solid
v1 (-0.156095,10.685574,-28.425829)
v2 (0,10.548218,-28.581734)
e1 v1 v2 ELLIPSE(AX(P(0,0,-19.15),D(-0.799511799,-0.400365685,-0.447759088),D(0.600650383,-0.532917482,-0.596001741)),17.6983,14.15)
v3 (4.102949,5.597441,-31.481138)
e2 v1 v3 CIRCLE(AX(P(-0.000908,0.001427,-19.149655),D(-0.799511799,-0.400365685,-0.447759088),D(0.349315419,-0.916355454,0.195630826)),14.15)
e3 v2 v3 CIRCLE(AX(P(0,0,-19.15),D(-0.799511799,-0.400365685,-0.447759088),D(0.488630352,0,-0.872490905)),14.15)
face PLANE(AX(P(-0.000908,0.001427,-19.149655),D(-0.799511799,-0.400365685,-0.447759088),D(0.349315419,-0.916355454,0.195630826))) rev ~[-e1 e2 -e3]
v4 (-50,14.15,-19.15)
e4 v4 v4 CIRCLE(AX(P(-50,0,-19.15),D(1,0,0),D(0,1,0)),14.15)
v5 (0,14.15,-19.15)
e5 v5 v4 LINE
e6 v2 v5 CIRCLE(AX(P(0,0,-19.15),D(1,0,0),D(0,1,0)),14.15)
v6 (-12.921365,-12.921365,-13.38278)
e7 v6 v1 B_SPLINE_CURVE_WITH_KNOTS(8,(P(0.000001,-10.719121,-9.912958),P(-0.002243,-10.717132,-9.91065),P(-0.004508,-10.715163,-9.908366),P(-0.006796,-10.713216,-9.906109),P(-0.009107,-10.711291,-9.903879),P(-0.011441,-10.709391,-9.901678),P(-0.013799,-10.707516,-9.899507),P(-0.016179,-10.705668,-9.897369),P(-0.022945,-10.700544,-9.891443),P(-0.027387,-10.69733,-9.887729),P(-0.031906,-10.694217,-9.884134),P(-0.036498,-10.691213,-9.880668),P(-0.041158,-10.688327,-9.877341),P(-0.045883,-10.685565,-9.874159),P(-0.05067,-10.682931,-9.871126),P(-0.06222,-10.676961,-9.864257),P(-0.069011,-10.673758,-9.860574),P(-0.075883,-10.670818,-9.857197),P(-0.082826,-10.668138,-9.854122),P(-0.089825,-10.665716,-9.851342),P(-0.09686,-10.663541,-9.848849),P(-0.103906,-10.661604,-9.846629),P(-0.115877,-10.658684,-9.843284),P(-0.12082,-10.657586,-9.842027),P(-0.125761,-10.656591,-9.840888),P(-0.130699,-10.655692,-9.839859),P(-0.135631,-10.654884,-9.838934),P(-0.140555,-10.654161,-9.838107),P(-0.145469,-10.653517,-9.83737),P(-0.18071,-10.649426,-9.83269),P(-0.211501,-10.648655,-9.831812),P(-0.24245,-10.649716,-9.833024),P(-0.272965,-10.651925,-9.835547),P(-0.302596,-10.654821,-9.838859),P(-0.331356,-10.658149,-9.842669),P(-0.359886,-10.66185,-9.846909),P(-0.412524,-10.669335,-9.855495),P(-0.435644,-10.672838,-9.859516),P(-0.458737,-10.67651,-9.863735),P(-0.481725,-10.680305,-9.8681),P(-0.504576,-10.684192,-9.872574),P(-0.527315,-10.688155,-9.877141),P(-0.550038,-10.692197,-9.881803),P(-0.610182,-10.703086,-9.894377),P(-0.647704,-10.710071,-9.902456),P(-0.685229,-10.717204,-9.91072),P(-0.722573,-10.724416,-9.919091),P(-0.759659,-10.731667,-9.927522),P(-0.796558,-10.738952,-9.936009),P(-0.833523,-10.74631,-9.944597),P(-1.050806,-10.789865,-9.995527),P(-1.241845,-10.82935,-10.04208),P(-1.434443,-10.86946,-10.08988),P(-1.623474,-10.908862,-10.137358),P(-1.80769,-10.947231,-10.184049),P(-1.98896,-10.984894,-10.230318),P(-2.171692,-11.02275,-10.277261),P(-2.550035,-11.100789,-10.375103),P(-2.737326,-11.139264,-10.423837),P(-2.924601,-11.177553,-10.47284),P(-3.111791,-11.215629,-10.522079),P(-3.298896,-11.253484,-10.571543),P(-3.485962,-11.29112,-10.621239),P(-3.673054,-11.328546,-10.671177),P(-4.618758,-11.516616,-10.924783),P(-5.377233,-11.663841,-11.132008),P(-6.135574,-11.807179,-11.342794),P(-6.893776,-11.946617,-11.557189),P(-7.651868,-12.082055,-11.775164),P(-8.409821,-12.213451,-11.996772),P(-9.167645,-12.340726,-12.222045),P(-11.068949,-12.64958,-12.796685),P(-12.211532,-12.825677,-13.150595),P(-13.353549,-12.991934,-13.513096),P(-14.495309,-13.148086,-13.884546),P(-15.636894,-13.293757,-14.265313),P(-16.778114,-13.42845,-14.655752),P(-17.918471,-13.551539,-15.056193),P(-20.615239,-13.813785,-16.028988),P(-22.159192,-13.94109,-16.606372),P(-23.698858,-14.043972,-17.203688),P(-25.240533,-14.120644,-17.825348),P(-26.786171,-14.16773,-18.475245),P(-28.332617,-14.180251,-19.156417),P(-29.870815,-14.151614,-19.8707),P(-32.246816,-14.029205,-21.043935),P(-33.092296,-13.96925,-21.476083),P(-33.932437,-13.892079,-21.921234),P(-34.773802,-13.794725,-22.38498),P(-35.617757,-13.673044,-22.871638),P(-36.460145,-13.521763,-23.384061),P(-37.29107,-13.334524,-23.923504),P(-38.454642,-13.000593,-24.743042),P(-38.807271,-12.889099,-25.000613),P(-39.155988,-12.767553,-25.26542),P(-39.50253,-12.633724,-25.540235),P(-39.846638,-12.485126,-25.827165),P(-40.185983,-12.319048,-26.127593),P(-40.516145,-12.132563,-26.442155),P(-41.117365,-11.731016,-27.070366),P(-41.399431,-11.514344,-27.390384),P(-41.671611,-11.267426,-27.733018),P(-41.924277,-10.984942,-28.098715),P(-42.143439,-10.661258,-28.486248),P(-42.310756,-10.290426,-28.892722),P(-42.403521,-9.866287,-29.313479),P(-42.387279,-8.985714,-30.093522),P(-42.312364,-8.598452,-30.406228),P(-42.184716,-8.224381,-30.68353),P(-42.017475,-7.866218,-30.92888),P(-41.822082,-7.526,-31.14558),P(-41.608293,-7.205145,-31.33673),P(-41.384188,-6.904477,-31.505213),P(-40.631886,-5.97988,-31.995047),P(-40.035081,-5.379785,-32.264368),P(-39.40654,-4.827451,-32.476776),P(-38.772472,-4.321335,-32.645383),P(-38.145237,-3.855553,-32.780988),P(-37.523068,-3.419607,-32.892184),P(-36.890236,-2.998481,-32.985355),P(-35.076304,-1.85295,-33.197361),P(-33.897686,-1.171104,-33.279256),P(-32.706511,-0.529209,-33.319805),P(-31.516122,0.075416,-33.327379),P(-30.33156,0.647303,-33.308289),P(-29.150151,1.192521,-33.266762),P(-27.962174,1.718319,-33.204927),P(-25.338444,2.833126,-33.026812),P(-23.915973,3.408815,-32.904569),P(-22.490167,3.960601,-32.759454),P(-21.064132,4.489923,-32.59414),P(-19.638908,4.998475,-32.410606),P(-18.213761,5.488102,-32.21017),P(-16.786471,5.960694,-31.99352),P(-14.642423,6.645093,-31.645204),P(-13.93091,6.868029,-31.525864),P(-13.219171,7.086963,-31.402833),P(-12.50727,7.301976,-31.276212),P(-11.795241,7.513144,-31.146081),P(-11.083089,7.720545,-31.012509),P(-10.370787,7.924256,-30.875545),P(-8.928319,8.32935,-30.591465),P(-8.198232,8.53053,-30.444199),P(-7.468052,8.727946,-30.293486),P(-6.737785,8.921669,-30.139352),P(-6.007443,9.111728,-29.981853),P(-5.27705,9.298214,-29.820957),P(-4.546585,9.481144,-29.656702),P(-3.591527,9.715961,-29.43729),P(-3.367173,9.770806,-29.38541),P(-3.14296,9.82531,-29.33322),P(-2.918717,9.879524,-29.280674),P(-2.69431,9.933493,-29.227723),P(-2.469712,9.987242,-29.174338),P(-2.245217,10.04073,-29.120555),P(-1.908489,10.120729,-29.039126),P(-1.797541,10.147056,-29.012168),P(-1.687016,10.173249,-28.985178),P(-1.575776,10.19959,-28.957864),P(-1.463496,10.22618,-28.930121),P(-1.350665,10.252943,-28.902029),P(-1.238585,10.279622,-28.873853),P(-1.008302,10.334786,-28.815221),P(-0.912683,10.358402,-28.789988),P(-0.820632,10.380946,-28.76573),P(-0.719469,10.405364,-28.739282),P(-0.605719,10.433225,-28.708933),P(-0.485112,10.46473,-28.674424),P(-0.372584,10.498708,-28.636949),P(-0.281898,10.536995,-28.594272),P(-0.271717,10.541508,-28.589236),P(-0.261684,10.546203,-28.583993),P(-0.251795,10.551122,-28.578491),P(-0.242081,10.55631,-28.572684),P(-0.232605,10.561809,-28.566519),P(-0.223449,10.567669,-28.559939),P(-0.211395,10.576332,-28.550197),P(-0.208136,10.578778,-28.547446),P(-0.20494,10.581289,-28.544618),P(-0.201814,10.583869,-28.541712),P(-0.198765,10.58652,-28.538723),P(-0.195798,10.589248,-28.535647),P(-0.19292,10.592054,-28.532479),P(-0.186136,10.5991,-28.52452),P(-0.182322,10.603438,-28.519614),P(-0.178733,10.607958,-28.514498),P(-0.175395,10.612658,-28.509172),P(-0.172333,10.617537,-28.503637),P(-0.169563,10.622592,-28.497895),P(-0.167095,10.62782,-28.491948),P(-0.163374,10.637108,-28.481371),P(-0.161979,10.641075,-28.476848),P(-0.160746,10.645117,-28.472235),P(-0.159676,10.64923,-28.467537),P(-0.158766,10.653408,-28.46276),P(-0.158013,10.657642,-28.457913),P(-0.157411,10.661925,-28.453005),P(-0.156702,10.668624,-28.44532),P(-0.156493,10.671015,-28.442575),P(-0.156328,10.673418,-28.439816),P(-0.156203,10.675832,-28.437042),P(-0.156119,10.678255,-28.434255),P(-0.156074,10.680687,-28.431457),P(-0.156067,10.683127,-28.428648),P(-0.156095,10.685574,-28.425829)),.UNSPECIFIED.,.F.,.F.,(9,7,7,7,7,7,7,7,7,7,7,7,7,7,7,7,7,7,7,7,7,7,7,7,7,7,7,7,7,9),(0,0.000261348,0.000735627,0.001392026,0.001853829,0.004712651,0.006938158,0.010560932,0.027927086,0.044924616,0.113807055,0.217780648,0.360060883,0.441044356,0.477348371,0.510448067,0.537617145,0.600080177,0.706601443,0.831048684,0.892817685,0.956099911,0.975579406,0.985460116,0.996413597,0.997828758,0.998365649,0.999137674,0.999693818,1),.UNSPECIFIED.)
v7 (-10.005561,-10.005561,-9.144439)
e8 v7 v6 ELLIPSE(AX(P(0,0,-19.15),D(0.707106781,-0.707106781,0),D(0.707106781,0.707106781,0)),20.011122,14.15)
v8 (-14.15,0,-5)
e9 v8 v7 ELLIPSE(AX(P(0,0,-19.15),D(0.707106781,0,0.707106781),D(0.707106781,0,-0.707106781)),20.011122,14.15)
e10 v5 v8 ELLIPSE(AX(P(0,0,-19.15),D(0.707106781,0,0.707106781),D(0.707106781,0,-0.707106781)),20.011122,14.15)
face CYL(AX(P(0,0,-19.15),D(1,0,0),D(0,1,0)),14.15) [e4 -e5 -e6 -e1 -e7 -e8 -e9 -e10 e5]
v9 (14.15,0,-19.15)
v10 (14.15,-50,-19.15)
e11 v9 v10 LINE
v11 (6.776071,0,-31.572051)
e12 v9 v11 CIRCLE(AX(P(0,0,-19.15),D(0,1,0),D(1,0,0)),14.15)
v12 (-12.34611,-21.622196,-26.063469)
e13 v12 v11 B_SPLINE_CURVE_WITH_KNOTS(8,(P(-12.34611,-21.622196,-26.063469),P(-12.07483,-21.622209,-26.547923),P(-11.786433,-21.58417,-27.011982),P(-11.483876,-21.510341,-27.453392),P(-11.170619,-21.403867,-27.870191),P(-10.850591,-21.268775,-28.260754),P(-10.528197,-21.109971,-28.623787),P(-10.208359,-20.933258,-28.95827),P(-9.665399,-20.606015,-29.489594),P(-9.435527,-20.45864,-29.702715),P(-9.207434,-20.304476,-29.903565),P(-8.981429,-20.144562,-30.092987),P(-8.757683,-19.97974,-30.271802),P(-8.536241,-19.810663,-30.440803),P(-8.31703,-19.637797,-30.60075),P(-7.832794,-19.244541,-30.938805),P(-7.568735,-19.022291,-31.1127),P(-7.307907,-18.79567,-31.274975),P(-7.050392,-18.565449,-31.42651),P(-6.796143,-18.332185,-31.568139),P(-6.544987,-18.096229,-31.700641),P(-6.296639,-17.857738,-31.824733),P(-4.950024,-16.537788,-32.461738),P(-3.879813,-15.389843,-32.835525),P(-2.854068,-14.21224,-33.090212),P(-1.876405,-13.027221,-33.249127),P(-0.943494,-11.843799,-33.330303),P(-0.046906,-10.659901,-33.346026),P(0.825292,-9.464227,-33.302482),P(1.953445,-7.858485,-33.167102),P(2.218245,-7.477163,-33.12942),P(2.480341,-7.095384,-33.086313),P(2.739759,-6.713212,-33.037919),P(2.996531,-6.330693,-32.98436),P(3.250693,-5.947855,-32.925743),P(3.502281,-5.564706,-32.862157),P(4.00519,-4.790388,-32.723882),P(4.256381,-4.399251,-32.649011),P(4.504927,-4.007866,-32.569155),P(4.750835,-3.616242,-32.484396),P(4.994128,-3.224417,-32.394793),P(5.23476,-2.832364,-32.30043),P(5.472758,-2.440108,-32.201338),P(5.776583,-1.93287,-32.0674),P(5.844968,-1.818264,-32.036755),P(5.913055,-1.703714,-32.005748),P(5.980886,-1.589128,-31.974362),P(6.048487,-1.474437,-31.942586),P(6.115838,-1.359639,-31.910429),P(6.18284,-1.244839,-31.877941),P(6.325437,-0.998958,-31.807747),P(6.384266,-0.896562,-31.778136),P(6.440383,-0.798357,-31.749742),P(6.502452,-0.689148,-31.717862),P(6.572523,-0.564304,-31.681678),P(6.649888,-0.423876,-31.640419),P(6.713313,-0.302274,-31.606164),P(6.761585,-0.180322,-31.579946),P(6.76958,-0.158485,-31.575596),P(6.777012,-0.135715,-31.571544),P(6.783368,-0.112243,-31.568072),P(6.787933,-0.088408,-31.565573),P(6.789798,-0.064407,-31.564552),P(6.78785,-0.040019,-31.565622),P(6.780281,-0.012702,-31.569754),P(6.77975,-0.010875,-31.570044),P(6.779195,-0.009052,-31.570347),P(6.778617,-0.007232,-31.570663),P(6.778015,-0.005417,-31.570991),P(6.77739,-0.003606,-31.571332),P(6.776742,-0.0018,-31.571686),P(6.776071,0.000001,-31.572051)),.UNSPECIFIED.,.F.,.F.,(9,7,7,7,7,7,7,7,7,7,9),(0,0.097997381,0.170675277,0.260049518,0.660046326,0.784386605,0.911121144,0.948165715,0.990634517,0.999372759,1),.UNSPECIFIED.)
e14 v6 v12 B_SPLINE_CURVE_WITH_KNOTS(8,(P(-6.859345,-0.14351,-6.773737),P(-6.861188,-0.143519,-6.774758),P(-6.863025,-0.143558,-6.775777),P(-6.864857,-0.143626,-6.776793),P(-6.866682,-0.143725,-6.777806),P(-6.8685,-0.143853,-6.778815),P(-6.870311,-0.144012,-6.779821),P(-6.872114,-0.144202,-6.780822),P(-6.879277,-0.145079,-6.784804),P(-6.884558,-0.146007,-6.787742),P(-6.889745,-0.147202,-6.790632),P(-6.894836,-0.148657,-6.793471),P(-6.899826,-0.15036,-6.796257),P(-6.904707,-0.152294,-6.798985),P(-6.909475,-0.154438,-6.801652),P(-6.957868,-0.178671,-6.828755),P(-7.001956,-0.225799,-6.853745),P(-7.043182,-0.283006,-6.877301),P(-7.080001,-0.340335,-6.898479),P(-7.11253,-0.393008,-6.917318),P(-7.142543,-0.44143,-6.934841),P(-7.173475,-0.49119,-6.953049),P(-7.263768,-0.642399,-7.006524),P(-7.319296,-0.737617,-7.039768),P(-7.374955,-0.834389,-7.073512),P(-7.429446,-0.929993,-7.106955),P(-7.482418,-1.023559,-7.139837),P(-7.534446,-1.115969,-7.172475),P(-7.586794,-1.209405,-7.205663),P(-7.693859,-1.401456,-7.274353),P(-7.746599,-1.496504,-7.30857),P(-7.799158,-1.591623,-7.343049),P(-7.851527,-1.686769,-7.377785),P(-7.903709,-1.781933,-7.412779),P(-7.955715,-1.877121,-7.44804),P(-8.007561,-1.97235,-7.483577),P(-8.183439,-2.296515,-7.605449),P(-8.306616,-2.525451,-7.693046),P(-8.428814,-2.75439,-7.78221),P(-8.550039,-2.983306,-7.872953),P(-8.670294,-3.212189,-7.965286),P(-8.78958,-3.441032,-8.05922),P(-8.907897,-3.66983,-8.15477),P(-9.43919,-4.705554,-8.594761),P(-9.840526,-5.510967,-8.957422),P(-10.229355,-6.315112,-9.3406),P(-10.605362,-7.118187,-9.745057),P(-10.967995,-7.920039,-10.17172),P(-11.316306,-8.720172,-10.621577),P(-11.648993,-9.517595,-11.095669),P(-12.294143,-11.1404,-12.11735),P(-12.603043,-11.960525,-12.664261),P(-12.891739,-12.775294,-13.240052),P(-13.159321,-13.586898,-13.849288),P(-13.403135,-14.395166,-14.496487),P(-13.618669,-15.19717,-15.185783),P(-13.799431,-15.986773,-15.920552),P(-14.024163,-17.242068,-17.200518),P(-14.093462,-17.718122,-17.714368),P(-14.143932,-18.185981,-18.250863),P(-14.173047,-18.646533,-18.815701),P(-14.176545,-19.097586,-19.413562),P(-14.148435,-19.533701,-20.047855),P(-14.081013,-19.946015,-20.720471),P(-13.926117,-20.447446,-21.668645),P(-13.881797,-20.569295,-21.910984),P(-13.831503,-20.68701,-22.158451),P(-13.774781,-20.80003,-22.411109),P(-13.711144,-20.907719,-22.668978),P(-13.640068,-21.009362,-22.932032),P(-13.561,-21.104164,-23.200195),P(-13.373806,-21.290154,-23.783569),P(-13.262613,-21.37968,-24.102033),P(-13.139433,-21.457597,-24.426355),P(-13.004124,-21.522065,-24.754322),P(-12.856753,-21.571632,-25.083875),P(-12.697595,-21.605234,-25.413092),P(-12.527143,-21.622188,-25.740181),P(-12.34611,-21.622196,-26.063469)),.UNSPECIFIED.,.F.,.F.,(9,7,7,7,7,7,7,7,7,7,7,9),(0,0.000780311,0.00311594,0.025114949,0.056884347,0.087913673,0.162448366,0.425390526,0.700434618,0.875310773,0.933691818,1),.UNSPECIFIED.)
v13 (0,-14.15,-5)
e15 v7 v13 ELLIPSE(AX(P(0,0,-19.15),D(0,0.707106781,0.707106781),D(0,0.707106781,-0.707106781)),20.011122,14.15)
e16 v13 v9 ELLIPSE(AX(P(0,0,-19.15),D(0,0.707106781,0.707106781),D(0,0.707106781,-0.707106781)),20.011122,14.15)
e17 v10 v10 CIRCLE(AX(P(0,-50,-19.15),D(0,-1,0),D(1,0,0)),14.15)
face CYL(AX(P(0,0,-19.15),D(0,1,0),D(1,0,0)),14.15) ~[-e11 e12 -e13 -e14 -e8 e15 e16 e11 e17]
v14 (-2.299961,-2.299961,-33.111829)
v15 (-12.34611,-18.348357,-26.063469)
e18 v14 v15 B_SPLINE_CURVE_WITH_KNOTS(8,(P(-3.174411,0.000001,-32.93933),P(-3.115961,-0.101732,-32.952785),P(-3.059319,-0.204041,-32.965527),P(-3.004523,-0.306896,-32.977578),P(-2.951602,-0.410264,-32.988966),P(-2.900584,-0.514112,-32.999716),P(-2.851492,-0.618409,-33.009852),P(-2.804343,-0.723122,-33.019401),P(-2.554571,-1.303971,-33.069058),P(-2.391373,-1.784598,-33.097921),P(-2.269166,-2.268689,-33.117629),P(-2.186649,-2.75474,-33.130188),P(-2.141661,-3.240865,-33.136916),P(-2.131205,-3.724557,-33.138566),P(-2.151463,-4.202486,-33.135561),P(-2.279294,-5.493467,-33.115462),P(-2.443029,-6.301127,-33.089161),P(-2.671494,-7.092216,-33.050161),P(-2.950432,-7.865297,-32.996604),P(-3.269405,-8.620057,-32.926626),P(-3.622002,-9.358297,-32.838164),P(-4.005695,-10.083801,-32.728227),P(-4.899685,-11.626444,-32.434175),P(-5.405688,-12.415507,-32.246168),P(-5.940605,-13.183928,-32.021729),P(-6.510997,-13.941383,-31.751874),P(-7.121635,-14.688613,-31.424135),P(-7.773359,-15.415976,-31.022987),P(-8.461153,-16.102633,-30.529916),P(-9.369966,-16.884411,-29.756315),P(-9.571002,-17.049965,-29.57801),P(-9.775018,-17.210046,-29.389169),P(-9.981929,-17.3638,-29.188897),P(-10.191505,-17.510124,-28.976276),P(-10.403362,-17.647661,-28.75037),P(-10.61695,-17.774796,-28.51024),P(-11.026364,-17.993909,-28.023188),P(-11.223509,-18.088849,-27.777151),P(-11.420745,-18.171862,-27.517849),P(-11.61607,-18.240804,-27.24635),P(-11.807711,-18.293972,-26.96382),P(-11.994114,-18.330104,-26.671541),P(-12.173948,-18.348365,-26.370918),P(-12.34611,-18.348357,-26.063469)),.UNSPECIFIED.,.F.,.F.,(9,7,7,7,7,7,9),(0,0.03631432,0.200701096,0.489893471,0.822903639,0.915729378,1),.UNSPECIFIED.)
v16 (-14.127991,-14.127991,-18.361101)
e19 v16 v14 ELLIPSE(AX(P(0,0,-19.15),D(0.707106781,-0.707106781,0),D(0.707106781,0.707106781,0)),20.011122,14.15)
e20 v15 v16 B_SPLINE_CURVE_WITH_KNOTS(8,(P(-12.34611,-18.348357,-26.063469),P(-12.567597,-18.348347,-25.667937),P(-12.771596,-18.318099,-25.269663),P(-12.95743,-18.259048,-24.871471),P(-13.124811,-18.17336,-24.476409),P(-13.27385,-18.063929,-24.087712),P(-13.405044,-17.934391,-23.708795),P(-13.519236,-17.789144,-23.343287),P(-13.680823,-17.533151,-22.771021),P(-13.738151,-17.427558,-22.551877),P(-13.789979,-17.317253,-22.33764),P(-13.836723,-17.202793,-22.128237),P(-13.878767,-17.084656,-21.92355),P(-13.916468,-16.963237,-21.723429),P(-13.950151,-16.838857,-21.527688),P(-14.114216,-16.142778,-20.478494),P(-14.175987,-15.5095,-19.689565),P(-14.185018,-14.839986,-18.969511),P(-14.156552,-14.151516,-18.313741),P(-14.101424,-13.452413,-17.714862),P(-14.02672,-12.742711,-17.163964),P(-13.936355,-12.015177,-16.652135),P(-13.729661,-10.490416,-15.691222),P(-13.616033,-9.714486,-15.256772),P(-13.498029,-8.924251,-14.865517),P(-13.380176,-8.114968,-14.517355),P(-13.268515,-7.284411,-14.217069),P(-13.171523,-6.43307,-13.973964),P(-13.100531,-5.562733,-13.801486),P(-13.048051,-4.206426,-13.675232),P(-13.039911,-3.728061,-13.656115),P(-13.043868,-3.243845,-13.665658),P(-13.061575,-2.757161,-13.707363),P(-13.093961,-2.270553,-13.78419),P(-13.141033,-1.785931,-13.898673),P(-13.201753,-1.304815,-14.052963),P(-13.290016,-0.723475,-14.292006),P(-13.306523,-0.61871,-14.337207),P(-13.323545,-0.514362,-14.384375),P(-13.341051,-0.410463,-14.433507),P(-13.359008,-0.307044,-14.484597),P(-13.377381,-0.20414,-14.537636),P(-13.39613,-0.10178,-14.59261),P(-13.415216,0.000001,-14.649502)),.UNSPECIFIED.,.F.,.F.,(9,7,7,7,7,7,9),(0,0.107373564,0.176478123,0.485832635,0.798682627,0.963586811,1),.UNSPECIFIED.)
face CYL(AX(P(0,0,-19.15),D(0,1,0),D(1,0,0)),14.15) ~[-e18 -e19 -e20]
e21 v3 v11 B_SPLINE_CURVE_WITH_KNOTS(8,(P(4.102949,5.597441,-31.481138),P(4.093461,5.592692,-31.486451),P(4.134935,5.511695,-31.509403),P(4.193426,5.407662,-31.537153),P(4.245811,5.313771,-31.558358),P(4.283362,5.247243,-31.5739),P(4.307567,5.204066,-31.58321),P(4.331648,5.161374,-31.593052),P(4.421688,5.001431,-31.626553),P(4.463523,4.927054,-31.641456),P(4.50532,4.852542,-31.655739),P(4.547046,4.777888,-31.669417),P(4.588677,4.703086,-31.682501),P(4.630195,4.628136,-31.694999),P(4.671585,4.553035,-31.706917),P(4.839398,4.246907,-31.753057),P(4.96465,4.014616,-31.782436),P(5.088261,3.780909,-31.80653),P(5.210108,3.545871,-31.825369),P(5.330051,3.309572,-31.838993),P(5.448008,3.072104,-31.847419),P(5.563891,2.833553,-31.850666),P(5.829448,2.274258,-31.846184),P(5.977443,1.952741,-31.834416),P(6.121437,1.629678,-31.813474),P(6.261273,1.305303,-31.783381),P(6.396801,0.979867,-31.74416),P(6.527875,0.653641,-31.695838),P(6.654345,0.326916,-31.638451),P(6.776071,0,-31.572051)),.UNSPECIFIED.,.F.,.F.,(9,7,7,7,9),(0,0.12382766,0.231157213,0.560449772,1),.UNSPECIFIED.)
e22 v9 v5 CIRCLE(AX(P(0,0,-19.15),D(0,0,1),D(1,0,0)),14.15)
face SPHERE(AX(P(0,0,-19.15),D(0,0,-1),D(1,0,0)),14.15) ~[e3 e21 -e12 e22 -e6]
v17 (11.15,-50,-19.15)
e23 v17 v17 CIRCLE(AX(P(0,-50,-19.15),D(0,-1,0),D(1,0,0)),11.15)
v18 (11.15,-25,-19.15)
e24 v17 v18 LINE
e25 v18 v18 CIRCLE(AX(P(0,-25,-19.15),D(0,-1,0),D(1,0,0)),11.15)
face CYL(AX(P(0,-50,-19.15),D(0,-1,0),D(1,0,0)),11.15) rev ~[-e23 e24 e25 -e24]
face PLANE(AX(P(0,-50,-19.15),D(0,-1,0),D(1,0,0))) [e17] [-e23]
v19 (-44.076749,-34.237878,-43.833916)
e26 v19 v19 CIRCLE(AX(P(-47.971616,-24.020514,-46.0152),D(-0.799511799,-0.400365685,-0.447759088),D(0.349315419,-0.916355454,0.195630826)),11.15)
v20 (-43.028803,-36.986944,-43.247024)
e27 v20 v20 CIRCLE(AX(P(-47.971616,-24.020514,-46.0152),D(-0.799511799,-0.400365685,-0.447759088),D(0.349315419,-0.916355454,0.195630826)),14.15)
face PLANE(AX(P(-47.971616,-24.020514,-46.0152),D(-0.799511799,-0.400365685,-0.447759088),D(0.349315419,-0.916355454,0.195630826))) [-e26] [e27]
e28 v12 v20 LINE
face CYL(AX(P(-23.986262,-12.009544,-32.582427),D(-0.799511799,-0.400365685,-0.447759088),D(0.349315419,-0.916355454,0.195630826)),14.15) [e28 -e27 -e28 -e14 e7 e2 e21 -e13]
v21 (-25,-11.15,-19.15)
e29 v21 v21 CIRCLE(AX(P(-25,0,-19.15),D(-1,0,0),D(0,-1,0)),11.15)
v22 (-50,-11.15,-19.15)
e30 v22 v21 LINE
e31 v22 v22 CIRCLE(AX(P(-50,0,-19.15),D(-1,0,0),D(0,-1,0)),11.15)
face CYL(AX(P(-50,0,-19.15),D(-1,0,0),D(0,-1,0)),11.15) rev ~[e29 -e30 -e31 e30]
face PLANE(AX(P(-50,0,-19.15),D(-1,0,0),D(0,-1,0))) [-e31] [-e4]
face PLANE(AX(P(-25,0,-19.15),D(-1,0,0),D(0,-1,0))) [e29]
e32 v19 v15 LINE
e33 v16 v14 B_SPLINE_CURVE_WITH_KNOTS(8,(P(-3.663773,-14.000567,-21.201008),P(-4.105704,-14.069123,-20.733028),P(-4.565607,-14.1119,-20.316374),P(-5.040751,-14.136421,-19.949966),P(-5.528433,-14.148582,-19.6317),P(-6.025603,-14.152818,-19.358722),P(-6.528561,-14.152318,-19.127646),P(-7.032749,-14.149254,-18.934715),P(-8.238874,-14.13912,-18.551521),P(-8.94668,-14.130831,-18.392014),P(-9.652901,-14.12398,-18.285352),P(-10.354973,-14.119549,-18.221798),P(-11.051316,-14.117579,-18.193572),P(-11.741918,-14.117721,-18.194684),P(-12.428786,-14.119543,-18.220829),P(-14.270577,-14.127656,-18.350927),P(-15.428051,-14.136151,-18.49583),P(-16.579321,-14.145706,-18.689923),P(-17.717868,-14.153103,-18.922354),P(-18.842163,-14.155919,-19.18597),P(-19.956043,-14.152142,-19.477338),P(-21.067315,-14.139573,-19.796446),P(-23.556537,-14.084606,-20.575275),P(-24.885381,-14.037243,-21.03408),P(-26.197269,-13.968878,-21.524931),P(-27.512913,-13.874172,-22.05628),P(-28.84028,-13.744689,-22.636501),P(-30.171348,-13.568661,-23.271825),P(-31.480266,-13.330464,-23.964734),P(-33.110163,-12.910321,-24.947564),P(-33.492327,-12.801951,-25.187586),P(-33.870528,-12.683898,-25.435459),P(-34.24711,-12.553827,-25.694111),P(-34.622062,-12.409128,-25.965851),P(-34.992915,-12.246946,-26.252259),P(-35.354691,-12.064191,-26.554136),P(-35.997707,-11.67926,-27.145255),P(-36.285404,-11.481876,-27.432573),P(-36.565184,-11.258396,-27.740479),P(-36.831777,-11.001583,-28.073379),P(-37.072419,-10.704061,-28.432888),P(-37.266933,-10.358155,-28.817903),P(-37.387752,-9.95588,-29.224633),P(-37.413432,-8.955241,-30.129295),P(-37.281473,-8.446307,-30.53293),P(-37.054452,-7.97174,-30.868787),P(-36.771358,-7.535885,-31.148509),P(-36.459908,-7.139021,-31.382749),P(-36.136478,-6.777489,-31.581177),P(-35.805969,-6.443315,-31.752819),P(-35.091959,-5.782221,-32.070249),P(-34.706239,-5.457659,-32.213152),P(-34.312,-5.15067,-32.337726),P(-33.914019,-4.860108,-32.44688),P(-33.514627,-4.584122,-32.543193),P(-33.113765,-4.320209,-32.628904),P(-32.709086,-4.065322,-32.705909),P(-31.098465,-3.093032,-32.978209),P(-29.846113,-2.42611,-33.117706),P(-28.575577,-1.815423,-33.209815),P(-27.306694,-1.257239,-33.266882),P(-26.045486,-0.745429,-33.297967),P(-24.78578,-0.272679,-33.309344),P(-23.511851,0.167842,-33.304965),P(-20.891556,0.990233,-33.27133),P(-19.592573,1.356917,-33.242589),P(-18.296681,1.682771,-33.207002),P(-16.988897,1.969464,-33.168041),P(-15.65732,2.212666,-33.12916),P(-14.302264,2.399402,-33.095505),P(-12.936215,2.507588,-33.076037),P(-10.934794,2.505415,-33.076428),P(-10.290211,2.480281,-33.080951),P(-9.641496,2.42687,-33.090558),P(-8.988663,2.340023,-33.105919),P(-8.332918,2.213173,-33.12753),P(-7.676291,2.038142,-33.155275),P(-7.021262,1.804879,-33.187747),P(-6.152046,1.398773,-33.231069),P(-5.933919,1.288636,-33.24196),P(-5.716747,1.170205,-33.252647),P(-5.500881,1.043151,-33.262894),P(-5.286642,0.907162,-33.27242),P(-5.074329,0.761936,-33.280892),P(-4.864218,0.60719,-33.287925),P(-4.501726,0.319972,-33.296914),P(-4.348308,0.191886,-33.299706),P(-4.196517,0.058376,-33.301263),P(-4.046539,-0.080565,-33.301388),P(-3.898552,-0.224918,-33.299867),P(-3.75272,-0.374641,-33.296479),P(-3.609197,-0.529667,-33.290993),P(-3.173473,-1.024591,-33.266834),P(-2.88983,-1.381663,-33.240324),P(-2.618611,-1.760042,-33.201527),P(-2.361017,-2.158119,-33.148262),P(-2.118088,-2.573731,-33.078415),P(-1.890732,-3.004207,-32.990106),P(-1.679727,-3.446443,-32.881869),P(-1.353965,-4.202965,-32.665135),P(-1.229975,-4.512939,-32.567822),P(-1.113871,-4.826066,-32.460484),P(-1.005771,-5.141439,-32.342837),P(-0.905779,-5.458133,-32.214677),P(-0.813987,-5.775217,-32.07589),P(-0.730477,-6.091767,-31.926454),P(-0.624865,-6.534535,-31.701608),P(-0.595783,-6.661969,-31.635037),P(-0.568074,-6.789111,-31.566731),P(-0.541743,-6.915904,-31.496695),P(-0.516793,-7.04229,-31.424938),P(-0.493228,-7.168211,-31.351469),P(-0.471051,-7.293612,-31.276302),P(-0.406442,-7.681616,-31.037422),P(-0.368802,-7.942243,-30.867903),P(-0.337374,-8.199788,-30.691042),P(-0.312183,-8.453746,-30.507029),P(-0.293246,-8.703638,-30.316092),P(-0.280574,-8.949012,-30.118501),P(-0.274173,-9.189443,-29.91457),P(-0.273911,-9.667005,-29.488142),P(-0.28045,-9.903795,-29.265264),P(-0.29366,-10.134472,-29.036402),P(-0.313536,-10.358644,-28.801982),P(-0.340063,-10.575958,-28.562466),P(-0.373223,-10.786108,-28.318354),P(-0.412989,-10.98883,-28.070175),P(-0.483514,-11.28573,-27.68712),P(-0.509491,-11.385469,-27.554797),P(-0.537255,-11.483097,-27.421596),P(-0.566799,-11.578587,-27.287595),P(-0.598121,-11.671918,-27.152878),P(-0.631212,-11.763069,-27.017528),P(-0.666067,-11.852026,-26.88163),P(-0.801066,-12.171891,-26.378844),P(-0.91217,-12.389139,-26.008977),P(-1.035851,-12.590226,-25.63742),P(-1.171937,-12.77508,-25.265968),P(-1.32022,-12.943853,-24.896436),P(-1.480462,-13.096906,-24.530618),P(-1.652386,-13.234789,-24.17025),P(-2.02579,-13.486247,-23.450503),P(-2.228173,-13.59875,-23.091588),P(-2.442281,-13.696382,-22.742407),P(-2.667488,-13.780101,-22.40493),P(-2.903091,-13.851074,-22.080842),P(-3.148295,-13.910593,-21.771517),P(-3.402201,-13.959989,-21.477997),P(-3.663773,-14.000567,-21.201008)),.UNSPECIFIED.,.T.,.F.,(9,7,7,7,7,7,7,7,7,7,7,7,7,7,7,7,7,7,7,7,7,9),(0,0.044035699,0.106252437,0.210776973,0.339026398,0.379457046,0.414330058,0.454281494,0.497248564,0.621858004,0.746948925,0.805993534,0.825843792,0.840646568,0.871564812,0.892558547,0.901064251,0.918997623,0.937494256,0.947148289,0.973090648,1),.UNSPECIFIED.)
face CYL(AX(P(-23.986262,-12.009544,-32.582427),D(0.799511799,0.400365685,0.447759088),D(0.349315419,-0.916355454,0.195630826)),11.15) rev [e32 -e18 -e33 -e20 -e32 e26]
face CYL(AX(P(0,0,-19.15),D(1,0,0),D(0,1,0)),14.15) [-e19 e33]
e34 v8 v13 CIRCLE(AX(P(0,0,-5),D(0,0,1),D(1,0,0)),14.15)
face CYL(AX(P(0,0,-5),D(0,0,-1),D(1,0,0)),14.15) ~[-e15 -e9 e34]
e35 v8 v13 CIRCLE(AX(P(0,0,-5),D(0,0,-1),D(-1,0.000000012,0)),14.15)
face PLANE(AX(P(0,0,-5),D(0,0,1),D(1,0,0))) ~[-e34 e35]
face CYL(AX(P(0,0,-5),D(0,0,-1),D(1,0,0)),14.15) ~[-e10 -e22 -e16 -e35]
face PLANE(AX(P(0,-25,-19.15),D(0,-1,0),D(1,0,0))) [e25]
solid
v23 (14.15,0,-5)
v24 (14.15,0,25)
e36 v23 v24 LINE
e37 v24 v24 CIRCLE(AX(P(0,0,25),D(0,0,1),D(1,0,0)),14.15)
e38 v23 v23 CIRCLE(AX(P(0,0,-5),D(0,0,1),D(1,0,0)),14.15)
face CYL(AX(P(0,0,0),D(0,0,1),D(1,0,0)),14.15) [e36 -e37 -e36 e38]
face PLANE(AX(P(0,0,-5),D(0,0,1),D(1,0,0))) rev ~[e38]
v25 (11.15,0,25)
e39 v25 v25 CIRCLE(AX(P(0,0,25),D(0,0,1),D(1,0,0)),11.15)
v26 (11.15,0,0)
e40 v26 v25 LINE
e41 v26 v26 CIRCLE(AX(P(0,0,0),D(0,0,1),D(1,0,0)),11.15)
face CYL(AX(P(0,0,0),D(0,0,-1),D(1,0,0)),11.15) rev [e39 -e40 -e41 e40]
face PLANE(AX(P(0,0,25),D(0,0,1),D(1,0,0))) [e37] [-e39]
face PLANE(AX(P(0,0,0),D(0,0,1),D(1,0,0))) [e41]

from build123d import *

# Parameters (mm, degrees)
F0_R      = 14.15
F0_R_2    = 11.15
F1_DEPTH  = 25
F2_R      = 14.15
F3_DEPTH  = 5
F4_R      = 14.15
F4_R_2    = 11.15
F5_DEPTH  = 50
F6_R      = 14.15
F6_R_2    = 11.15
F7_DEPTH  = 50
F16_R     = 14.15
F16_R_2   = 11.15
F17_DEPTH = 30
F10_R     = 11.15
F18_DEPTH = 35
F11_R     = 11.15
F19_DEPTH = 30
F20_R     = 11.15
F21_DEPTH = 50
F22_R     = 11.15
F23_DEPTH = 25
F24_R     = 11.15
F25_DEPTH = 50.1
F26_R     = 11.15
F27_DEPTH = 25


with BuildPart() as f1:
    # F0 (on Top) → F1 (new body)
    with BuildSketch(Plane.XY):
        Circle(F0_R)
        Circle(F0_R_2, mode=Mode.SUBTRACT)
    extrude(amount=F1_DEPTH)

    # F2 (on Top) → F3 (join)
    with BuildSketch(Plane.XY):
        Circle(F2_R)
    extrude(amount=-F3_DEPTH)


with BuildPart() as f5:
    # F4 (on Right) → F5 (new body)
    with BuildSketch(Plane.YZ):
        with Locations((0, -19.15)):
            Circle(F4_R)
        with Locations((0, -19.15)):
            Circle(F4_R_2, mode=Mode.SUBTRACT)
    extrude(amount=-F5_DEPTH)

    # F6 (on Front) → F7 (join)
    with BuildSketch(Plane.XZ):
        with Locations((0, -19.15)):
            Circle(F6_R)
        with Locations((0, -19.15)):
            Circle(F6_R_2, mode=Mode.SUBTRACT)
    extrude(amount=F7_DEPTH)

    # F8 (on face) → F9 (revolve)
    with BuildSketch(Plane(origin=(0, 0, 0), x_dir=(-1, 0, 0), z_dir=(0, 1, 0))):
        with BuildLine():
            Line((-14.15, -5), (-14.15, -19.15))
            ThreePointArc((-14.15, -19.15), (-10.0055609538, -29.1555609538), (0, -33.3))
            Line((0, -33.3), (0, -5))
            Line((0, -5), (-14.15, -5))
        make_face()
    revolve(axis=Axis((0, 0, -19.15), (0, 0, 1)))

    # F16 (on line) → F17 (join, symmetric)
    with BuildSketch(Plane(origin=(-30.8408370839, -15.4439407788, -17.2721216794), x_dir=(0.3493154192, -0.9163554539, 0.1956308258), z_dir=(-0.7995117993, -0.4003656855, -0.4477590878))):
        with Locations((-3.7478874438, -16.7074557394)):
            Circle(F16_R)
        with Locations((-3.7478874438, -16.7074557394)):
            Circle(F16_R_2, mode=Mode.SUBTRACT)
    extrude(amount=F17_DEPTH, both=True)

    # F10 (on face) → F18 (cut)
    with BuildSketch(Plane(origin=(-50, 0, 0), x_dir=(0, -1, 0), z_dir=(-1, 0, 0))):
        with Locations((0, -19.15)):
            Circle(F10_R)
    extrude(amount=-F18_DEPTH, mode=Mode.SUBTRACT)

    # F11 (on face) → F19 (cut)
    with BuildSketch(Plane.XZ.offset(50)):
        with Locations((0, -19.15)):
            Circle(F11_R)
    extrude(amount=-F19_DEPTH, mode=Mode.SUBTRACT)

    # F20 (on face) → F21 (join)
    with BuildSketch(Plane(origin=(-50, 0, 0), x_dir=(0, -1, 0), z_dir=(-1, 0, 0))):
        with Locations((0, -19.15)):
            Circle(F20_R)
    extrude(amount=-F21_DEPTH)

    # F22 (on face) → F23 (cut)
    with BuildSketch(Plane(origin=(-50, 0, 0), x_dir=(0, -1, 0), z_dir=(-1, 0, 0))):
        with Locations((0, -19.15)):
            Circle(F22_R)
    extrude(amount=-F23_DEPTH, mode=Mode.SUBTRACT)

    # F24 (on face) → F25 (join)
    with BuildSketch(Plane.XZ.offset(50)):
        with Locations((0, -19.15)):
            Circle(F24_R)
    extrude(amount=-F25_DEPTH)

    # F26 (on face) → F27 (cut)
    with BuildSketch(Plane.XZ.offset(50)):
        with Locations((0, -19.15)):
            Circle(F26_R)
    extrude(amount=-F27_DEPTH, mode=Mode.SUBTRACT)


solid = Compound([f1.part, f5.part])
